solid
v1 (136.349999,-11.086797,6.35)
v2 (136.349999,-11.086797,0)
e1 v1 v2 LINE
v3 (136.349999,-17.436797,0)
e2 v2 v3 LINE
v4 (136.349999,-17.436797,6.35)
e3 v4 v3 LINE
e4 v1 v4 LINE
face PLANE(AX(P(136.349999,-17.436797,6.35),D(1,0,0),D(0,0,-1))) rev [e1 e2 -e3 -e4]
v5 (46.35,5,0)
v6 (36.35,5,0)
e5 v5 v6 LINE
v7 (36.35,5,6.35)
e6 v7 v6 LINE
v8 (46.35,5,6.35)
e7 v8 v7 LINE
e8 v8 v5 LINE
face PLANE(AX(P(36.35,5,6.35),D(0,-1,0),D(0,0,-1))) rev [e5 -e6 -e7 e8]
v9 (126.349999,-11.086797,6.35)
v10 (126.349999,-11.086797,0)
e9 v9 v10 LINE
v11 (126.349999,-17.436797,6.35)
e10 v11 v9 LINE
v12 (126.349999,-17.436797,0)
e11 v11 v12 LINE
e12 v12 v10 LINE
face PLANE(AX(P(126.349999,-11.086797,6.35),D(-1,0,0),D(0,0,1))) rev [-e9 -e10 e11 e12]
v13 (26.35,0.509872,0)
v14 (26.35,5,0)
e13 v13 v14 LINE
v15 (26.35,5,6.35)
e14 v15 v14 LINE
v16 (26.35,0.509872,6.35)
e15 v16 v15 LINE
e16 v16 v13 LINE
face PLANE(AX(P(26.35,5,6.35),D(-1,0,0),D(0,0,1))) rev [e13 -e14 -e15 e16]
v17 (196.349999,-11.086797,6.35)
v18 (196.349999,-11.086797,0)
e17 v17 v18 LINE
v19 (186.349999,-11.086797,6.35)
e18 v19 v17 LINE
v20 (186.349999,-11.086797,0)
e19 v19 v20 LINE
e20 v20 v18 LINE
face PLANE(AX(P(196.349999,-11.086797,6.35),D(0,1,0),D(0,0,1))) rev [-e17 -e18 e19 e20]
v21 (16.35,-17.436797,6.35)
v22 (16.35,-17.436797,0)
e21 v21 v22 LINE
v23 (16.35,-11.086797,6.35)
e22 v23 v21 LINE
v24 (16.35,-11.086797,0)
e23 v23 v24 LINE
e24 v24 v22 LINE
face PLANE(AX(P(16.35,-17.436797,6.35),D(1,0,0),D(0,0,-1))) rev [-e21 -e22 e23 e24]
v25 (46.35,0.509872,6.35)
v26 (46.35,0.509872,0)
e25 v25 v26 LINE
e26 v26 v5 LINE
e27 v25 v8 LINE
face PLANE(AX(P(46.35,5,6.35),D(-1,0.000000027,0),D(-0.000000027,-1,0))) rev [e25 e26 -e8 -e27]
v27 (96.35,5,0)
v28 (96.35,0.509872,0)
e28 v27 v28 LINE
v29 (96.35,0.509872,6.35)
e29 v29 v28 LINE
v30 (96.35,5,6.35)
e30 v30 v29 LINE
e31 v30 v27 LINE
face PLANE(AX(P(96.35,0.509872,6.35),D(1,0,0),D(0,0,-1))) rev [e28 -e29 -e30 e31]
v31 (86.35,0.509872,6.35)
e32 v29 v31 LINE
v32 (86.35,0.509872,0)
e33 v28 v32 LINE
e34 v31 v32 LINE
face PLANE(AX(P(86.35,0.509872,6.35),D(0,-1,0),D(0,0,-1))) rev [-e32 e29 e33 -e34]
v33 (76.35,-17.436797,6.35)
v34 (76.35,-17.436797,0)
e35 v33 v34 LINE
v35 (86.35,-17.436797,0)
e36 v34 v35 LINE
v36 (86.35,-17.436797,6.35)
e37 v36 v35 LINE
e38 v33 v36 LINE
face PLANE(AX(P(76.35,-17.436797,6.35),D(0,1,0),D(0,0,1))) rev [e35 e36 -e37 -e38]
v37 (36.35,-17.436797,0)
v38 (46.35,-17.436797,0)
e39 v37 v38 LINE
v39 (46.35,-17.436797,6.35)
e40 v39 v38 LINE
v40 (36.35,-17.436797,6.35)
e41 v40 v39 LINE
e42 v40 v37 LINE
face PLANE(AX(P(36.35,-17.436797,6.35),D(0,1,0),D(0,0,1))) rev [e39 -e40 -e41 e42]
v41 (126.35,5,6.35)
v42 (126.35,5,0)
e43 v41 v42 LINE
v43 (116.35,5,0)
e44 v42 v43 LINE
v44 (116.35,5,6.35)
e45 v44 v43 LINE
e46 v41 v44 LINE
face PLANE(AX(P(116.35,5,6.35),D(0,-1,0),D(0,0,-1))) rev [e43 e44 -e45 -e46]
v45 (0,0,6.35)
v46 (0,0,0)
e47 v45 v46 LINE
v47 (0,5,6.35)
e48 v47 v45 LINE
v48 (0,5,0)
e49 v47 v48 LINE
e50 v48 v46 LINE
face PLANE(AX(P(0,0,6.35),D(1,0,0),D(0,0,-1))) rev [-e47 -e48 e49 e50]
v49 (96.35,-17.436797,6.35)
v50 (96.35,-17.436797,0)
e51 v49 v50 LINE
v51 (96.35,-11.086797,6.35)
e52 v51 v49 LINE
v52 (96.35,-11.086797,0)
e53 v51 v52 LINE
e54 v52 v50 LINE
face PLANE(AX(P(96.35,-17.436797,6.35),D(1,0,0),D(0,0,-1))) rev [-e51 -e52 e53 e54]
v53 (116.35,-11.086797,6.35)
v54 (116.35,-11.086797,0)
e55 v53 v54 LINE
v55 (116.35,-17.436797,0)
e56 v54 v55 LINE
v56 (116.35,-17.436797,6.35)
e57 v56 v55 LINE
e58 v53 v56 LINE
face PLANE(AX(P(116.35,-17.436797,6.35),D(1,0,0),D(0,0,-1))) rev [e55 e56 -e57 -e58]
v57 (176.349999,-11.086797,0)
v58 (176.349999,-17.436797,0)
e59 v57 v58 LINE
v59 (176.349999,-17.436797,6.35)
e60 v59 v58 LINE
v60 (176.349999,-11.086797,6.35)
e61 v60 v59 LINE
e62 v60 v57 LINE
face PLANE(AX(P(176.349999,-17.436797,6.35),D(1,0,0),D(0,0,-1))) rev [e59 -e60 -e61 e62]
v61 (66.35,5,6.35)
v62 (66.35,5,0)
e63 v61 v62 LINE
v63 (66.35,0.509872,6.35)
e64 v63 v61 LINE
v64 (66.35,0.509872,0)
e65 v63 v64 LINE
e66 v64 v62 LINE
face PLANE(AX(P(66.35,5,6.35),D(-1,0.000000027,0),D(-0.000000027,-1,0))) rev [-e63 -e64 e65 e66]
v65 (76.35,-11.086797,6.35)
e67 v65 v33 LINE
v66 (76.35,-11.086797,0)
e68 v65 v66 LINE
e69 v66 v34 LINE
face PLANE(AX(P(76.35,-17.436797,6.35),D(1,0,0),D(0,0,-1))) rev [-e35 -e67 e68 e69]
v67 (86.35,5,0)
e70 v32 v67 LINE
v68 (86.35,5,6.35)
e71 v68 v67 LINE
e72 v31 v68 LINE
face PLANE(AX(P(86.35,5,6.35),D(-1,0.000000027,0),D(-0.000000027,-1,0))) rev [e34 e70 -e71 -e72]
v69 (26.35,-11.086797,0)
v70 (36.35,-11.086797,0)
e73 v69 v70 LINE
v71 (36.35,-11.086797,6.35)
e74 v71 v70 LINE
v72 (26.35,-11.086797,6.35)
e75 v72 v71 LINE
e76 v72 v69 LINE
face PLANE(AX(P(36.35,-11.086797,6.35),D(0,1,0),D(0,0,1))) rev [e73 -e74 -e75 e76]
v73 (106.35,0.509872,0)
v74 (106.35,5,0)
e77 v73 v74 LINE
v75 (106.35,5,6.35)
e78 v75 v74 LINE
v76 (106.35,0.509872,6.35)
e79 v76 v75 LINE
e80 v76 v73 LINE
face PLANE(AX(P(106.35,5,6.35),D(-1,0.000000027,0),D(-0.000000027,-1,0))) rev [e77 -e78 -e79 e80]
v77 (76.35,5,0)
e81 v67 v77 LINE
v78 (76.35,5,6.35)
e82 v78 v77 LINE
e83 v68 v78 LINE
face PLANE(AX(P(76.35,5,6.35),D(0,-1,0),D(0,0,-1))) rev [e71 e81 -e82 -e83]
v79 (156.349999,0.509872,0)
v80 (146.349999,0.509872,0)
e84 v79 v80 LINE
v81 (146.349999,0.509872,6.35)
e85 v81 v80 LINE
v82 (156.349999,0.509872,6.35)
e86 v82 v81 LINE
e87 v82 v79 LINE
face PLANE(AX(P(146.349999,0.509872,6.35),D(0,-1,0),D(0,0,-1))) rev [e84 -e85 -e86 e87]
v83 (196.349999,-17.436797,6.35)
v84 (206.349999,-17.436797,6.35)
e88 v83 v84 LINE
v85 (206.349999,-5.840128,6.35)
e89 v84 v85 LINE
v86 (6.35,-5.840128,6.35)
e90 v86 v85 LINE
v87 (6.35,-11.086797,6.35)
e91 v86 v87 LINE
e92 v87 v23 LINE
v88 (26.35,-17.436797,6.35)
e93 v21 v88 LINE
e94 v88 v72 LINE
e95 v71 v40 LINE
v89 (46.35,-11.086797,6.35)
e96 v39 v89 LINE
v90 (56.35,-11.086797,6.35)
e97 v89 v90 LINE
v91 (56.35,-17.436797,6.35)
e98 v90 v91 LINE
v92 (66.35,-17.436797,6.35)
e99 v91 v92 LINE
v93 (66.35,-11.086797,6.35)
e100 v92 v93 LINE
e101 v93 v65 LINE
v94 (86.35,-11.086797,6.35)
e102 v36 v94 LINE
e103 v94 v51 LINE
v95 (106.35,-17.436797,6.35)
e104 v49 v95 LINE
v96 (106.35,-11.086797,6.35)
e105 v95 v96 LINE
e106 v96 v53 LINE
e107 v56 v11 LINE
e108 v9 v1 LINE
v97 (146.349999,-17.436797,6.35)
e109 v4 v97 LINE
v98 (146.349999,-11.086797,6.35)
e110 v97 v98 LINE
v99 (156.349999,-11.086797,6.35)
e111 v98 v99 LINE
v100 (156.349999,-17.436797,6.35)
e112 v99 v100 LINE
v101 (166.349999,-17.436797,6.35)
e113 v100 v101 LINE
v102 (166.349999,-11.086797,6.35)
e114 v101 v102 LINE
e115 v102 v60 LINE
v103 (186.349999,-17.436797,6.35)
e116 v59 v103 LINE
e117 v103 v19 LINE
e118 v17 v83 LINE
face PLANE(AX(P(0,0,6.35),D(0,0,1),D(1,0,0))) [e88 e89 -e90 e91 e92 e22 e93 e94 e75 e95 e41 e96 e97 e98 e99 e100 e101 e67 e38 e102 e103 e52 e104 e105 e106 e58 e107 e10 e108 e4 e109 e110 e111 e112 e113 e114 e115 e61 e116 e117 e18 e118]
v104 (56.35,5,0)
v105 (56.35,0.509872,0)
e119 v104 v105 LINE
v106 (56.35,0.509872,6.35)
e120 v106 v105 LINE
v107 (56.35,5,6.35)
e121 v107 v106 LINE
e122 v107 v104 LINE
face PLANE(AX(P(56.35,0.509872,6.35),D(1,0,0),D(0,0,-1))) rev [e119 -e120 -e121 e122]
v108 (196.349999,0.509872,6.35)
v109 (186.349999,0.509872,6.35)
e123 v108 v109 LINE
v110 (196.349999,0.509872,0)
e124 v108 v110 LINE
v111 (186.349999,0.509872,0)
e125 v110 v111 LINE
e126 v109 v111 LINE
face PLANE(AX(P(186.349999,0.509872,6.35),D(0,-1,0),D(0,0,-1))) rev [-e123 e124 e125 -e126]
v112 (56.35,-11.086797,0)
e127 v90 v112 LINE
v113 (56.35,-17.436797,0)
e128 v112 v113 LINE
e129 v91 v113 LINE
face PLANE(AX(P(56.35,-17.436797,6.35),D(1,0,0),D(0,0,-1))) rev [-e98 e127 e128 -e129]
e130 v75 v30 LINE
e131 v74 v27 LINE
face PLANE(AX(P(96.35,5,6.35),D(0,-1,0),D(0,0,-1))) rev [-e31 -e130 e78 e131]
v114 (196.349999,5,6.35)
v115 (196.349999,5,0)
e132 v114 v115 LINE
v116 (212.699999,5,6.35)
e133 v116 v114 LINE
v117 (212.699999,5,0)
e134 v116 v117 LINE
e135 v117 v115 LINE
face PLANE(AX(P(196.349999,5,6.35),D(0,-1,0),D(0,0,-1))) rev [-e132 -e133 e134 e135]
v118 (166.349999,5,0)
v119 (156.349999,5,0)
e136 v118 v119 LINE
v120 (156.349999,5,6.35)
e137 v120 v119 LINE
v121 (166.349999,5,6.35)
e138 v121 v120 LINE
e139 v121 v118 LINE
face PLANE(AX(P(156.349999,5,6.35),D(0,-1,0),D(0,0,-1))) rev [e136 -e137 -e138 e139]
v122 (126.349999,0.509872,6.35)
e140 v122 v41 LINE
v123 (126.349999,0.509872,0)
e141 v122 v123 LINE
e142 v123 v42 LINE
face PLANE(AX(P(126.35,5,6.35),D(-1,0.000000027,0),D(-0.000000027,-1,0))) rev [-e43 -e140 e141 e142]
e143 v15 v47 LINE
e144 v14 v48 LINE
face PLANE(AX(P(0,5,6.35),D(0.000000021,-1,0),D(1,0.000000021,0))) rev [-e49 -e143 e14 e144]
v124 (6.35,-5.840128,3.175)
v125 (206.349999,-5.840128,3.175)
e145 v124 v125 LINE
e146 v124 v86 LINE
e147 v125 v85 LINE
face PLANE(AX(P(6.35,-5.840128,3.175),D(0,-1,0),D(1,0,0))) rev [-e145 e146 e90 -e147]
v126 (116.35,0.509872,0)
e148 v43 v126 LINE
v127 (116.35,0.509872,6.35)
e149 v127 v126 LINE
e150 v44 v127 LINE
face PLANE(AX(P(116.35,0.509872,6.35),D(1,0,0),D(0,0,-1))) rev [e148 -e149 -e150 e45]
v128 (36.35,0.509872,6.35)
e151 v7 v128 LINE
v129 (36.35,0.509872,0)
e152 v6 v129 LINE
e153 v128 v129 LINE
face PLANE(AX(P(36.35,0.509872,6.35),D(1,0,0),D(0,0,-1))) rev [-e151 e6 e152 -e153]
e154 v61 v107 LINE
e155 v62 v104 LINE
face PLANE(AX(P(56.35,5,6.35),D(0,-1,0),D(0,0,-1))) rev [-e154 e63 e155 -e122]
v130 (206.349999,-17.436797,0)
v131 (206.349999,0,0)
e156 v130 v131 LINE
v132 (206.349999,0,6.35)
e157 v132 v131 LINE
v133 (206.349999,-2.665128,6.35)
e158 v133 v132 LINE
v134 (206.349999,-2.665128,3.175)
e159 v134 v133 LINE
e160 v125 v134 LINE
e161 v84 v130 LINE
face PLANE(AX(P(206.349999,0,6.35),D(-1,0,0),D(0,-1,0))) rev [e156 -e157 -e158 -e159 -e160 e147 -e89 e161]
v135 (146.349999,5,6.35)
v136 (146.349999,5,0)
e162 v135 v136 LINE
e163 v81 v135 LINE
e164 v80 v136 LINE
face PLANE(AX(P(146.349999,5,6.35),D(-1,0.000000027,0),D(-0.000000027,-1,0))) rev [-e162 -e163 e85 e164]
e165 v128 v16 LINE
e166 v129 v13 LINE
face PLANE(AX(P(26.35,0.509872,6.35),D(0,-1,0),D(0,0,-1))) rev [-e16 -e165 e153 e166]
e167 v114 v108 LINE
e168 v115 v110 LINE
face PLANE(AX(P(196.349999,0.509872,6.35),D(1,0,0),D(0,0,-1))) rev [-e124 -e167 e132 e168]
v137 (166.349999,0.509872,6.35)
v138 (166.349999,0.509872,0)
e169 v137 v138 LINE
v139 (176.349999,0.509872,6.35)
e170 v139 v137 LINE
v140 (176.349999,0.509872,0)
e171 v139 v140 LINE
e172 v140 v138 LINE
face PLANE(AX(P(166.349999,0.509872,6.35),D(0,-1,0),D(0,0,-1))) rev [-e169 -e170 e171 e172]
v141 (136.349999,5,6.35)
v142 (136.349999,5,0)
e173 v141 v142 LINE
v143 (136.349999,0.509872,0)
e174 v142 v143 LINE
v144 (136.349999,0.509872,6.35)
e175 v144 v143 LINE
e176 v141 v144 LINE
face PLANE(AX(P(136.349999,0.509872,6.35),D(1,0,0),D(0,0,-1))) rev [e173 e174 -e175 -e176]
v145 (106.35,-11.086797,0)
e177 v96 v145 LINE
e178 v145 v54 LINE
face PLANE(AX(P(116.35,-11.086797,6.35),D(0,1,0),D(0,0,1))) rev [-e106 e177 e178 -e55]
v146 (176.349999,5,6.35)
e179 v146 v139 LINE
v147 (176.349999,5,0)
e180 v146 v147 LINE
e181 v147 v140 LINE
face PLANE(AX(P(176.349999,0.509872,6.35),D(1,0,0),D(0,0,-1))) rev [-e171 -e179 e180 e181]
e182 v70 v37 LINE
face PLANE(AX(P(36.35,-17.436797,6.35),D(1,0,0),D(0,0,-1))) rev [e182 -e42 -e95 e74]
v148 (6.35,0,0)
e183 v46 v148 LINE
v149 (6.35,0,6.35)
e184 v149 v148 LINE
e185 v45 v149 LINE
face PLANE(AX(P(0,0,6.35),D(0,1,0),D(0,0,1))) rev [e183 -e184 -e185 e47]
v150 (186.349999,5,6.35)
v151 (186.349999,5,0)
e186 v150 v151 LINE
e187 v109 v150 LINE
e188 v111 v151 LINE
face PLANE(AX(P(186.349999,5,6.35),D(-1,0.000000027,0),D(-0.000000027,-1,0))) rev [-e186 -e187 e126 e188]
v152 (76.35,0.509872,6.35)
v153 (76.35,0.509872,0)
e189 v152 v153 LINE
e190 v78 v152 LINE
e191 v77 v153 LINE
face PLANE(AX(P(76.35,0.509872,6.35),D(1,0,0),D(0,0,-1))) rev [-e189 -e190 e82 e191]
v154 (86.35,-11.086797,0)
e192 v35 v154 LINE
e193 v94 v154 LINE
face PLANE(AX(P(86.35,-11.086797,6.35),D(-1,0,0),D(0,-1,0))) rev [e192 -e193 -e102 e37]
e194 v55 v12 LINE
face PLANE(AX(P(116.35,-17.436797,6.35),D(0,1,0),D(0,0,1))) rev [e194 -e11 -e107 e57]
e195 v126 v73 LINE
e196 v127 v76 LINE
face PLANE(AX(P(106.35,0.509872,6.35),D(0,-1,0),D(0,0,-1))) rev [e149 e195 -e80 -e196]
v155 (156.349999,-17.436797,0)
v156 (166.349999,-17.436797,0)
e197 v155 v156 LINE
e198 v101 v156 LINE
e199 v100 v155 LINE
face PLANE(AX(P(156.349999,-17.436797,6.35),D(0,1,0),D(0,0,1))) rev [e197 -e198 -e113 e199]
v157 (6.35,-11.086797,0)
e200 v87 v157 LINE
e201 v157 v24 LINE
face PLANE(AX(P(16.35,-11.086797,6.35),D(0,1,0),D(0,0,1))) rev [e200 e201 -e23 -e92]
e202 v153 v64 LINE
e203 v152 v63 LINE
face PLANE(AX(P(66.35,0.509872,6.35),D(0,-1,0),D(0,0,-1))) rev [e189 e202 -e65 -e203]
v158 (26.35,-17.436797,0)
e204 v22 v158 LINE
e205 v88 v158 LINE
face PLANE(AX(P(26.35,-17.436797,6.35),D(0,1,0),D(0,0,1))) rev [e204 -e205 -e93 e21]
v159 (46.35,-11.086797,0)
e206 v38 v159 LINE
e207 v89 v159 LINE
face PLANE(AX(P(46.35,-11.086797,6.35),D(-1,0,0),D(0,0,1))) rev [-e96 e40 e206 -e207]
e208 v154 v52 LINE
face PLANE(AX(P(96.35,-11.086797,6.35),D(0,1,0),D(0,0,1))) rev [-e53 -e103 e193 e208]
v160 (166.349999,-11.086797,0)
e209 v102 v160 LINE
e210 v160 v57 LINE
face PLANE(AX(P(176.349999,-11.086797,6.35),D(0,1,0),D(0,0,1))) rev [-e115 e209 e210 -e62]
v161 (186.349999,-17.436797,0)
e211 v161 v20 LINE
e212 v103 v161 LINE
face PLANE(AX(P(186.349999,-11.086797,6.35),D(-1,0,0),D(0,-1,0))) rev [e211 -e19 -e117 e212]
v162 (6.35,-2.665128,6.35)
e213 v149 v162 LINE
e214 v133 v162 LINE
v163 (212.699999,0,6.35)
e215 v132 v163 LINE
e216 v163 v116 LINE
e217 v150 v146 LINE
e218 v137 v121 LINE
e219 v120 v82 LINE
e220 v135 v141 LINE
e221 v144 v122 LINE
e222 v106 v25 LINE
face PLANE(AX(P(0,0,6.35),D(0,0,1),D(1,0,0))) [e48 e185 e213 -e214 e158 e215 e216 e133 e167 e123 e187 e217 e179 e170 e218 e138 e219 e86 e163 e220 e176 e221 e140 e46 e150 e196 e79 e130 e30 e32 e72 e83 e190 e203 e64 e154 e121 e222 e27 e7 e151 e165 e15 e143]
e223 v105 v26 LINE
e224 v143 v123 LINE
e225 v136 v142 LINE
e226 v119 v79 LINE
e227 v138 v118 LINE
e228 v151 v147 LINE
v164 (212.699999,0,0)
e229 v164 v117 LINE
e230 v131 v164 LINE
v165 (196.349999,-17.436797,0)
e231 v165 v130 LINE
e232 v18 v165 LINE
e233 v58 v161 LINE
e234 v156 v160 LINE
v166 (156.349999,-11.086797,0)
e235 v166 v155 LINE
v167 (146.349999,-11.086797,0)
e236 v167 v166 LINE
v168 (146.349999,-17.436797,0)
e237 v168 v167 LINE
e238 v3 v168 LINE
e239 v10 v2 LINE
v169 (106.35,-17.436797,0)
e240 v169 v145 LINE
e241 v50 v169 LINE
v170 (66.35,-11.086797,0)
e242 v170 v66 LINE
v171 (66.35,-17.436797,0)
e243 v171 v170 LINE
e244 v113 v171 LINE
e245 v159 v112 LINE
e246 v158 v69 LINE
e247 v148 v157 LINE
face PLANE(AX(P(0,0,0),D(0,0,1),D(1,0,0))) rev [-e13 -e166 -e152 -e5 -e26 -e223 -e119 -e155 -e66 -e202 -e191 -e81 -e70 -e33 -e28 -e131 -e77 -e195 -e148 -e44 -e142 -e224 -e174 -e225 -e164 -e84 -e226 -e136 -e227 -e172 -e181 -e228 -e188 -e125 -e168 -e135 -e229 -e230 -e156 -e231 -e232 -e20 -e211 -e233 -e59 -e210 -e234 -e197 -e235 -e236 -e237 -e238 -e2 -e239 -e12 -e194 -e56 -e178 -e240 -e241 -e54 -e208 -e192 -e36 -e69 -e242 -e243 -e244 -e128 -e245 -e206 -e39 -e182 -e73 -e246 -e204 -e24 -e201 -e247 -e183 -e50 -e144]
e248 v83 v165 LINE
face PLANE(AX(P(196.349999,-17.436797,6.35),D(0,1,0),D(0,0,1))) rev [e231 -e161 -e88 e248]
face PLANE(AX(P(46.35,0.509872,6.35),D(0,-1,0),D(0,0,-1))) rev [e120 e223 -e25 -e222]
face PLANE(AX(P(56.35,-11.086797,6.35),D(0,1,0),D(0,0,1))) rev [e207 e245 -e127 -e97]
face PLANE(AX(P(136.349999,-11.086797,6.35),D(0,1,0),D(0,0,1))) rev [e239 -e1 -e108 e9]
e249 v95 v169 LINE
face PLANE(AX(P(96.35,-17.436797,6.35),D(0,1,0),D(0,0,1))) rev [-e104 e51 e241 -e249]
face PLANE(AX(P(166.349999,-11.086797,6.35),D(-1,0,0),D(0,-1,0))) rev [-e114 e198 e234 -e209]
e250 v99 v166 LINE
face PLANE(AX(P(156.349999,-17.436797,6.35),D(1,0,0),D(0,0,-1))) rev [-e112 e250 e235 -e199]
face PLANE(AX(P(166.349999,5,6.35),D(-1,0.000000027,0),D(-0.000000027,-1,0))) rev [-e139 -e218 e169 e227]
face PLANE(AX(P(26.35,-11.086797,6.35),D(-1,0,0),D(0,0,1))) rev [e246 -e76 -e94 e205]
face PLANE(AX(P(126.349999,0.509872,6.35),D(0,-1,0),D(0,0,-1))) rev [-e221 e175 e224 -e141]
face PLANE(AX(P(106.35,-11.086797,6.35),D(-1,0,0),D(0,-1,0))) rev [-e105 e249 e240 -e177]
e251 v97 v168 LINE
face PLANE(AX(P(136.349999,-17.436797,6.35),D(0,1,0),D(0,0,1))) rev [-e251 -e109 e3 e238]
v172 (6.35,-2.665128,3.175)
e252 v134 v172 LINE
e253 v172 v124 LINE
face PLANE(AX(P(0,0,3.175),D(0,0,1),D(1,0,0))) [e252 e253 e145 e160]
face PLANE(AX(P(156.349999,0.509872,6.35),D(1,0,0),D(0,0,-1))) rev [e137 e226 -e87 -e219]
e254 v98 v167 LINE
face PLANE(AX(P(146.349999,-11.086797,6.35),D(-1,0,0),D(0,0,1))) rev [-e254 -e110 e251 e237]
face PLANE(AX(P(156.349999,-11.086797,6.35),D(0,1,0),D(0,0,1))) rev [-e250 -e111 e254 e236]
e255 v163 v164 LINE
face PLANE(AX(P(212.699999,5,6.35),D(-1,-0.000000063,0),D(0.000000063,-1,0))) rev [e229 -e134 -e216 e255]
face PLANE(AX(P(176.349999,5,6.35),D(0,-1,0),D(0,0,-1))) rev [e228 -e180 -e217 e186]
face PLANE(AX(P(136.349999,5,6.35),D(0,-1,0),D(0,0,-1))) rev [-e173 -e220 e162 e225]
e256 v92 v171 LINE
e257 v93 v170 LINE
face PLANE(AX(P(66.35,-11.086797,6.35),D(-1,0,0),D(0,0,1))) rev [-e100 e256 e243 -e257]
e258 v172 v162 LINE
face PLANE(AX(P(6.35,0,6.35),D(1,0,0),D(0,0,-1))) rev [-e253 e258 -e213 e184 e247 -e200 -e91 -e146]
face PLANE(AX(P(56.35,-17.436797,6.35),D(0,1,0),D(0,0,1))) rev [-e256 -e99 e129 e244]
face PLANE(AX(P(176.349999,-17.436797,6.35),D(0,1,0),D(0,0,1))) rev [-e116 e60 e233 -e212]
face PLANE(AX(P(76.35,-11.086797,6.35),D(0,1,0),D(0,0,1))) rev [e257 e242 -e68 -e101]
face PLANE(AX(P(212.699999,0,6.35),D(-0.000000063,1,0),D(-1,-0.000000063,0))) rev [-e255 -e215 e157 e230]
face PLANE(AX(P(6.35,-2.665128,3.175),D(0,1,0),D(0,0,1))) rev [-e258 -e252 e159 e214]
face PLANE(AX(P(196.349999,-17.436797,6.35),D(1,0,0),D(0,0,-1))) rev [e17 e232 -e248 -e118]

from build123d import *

# Parameters (mm, degrees)
BOSS_EXTRUDE1_START         = -11.086796564
BOSS_EXTRUDE1_OUTLINE_W     = 199.999998902
BOSS_EXTRUDE1_OUTLINE_H     = 6.35
BOSS_EXTRUDE1_DEPTH         = 11.596668503
BOSS_EXTRUDE1_START_2       = -17.436796564
BOSS_EXTRUDE1_2_OUTLINE_W   = 10
BOSS_EXTRUDE1_2_OUTLINE_H   = 6.35
BOSS_EXTRUDE1_2_OUTLINE_W_2 = 9.999999878
BOSS_EXTRUDE1_2_DEPTH       = 22.436796492
BOSS_EXTRUDE1_3_OUTLINE_W   = 16.35
BOSS_EXTRUDE1_3_OUTLINE_H   = 6.35
BOSS_EXTRUDE1_3_DEPTH       = 4.999999928
SKETCH2_W                   = 199.999998902
SKETCH2_H                   = 3.175
CUT_EXTRUDE1_DEPTH          = 3.175


# Read off the part's stored shape, not the designer's step: Boss-Extrude1
with BuildPart() as part:
    # Boss-Extrude1 outline → Boss-Extrude1 (new body)
    with BuildSketch(Plane(origin=(0, 0, 0), x_dir=(1, 0, 0), z_dir=(0, 1, 0)).offset(BOSS_EXTRUDE1_START)):
        with Locations((106.349999451, -3.175)):
            Rectangle(BOSS_EXTRUDE1_OUTLINE_W, BOSS_EXTRUDE1_OUTLINE_H)
    extrude(amount=BOSS_EXTRUDE1_DEPTH)



with BuildPart() as body_2:
    # Boss-Extrude1 2 outline → Boss-Extrude1 2 (new body)
    with BuildSketch(Plane(origin=(0, 0, 0), x_dir=(1, 0, 0), z_dir=(0, 1, 0)).offset(BOSS_EXTRUDE1_START_2)):
        Polygon((76.349999756, 0), (76.349999756, -6.35), (86.349999688, -6.35), (86.349999634, 0), align=None)
        Polygon((56.349999878, -6.35), (66.349999811, -6.35), (66.349999865, 0), (56.349999878, 0), align=None)
        Polygon((96.349999634, 0), (96.349999634, -6.35), (106.349999567, -6.35), (106.349999512, 0), align=None)
        Polygon((36.35, -6.35), (46.349999932, -6.35), (46.349999987, 0), (36.35, 0), align=None)
        Polygon((116.349999512, 0), (116.349999512, -6.35), (126.349999444, -6.35), (126.34999939, 0), align=None)
        with Locations((21.35, -3.175)):
            Rectangle(BOSS_EXTRUDE1_2_OUTLINE_W, BOSS_EXTRUDE1_2_OUTLINE_H)
        Polygon((136.34999939, 0), (136.34999939, -6.35), (146.349999322, -6.35), (146.349999268, 0), align=None)
        Polygon((156.349999268, 0), (156.349999268, -6.35), (166.349999201, -6.35), (166.349999146, 0), align=None)
        Polygon((176.349999146, 0), (176.349999146, -6.35), (186.349999078, -6.35), (186.349999024, 0), align=None)
        with Locations((201.349998963, -3.175)):
            Rectangle(BOSS_EXTRUDE1_2_OUTLINE_W_2, BOSS_EXTRUDE1_2_OUTLINE_H)
    extrude(amount=BOSS_EXTRUDE1_2_DEPTH)


with BuildPart() as part_1:
    add(part.part)

    add(body_2.part)  # Boss-Extrude1 3 merges body 2
    # Boss-Extrude1 3 outline → Boss-Extrude1 3 (add)
    with BuildSketch(Plane(origin=(0, 0, 0), x_dir=(1, 0, 0), z_dir=(0, 1, 0))):
        with Locations((8.175, -3.175)):
            Rectangle(BOSS_EXTRUDE1_3_OUTLINE_W, BOSS_EXTRUDE1_3_OUTLINE_H)
        Polygon((206.349998902, 0), (206.349998902, -6.35), (212.699998902, -6.35), (212.699998619, 0), align=None)
    extrude(amount=BOSS_EXTRUDE1_3_DEPTH)

    # Sketch2 → Cut-Extrude1 (cut)
    with BuildSketch(Plane.XY.offset(6.35)):
        with Locations((106.349999451, -4.252628114)):
            Rectangle(SKETCH2_W, SKETCH2_H)
    extrude(amount=-CUT_EXTRUDE1_DEPTH, mode=Mode.SUBTRACT)


solid = part_1.part
